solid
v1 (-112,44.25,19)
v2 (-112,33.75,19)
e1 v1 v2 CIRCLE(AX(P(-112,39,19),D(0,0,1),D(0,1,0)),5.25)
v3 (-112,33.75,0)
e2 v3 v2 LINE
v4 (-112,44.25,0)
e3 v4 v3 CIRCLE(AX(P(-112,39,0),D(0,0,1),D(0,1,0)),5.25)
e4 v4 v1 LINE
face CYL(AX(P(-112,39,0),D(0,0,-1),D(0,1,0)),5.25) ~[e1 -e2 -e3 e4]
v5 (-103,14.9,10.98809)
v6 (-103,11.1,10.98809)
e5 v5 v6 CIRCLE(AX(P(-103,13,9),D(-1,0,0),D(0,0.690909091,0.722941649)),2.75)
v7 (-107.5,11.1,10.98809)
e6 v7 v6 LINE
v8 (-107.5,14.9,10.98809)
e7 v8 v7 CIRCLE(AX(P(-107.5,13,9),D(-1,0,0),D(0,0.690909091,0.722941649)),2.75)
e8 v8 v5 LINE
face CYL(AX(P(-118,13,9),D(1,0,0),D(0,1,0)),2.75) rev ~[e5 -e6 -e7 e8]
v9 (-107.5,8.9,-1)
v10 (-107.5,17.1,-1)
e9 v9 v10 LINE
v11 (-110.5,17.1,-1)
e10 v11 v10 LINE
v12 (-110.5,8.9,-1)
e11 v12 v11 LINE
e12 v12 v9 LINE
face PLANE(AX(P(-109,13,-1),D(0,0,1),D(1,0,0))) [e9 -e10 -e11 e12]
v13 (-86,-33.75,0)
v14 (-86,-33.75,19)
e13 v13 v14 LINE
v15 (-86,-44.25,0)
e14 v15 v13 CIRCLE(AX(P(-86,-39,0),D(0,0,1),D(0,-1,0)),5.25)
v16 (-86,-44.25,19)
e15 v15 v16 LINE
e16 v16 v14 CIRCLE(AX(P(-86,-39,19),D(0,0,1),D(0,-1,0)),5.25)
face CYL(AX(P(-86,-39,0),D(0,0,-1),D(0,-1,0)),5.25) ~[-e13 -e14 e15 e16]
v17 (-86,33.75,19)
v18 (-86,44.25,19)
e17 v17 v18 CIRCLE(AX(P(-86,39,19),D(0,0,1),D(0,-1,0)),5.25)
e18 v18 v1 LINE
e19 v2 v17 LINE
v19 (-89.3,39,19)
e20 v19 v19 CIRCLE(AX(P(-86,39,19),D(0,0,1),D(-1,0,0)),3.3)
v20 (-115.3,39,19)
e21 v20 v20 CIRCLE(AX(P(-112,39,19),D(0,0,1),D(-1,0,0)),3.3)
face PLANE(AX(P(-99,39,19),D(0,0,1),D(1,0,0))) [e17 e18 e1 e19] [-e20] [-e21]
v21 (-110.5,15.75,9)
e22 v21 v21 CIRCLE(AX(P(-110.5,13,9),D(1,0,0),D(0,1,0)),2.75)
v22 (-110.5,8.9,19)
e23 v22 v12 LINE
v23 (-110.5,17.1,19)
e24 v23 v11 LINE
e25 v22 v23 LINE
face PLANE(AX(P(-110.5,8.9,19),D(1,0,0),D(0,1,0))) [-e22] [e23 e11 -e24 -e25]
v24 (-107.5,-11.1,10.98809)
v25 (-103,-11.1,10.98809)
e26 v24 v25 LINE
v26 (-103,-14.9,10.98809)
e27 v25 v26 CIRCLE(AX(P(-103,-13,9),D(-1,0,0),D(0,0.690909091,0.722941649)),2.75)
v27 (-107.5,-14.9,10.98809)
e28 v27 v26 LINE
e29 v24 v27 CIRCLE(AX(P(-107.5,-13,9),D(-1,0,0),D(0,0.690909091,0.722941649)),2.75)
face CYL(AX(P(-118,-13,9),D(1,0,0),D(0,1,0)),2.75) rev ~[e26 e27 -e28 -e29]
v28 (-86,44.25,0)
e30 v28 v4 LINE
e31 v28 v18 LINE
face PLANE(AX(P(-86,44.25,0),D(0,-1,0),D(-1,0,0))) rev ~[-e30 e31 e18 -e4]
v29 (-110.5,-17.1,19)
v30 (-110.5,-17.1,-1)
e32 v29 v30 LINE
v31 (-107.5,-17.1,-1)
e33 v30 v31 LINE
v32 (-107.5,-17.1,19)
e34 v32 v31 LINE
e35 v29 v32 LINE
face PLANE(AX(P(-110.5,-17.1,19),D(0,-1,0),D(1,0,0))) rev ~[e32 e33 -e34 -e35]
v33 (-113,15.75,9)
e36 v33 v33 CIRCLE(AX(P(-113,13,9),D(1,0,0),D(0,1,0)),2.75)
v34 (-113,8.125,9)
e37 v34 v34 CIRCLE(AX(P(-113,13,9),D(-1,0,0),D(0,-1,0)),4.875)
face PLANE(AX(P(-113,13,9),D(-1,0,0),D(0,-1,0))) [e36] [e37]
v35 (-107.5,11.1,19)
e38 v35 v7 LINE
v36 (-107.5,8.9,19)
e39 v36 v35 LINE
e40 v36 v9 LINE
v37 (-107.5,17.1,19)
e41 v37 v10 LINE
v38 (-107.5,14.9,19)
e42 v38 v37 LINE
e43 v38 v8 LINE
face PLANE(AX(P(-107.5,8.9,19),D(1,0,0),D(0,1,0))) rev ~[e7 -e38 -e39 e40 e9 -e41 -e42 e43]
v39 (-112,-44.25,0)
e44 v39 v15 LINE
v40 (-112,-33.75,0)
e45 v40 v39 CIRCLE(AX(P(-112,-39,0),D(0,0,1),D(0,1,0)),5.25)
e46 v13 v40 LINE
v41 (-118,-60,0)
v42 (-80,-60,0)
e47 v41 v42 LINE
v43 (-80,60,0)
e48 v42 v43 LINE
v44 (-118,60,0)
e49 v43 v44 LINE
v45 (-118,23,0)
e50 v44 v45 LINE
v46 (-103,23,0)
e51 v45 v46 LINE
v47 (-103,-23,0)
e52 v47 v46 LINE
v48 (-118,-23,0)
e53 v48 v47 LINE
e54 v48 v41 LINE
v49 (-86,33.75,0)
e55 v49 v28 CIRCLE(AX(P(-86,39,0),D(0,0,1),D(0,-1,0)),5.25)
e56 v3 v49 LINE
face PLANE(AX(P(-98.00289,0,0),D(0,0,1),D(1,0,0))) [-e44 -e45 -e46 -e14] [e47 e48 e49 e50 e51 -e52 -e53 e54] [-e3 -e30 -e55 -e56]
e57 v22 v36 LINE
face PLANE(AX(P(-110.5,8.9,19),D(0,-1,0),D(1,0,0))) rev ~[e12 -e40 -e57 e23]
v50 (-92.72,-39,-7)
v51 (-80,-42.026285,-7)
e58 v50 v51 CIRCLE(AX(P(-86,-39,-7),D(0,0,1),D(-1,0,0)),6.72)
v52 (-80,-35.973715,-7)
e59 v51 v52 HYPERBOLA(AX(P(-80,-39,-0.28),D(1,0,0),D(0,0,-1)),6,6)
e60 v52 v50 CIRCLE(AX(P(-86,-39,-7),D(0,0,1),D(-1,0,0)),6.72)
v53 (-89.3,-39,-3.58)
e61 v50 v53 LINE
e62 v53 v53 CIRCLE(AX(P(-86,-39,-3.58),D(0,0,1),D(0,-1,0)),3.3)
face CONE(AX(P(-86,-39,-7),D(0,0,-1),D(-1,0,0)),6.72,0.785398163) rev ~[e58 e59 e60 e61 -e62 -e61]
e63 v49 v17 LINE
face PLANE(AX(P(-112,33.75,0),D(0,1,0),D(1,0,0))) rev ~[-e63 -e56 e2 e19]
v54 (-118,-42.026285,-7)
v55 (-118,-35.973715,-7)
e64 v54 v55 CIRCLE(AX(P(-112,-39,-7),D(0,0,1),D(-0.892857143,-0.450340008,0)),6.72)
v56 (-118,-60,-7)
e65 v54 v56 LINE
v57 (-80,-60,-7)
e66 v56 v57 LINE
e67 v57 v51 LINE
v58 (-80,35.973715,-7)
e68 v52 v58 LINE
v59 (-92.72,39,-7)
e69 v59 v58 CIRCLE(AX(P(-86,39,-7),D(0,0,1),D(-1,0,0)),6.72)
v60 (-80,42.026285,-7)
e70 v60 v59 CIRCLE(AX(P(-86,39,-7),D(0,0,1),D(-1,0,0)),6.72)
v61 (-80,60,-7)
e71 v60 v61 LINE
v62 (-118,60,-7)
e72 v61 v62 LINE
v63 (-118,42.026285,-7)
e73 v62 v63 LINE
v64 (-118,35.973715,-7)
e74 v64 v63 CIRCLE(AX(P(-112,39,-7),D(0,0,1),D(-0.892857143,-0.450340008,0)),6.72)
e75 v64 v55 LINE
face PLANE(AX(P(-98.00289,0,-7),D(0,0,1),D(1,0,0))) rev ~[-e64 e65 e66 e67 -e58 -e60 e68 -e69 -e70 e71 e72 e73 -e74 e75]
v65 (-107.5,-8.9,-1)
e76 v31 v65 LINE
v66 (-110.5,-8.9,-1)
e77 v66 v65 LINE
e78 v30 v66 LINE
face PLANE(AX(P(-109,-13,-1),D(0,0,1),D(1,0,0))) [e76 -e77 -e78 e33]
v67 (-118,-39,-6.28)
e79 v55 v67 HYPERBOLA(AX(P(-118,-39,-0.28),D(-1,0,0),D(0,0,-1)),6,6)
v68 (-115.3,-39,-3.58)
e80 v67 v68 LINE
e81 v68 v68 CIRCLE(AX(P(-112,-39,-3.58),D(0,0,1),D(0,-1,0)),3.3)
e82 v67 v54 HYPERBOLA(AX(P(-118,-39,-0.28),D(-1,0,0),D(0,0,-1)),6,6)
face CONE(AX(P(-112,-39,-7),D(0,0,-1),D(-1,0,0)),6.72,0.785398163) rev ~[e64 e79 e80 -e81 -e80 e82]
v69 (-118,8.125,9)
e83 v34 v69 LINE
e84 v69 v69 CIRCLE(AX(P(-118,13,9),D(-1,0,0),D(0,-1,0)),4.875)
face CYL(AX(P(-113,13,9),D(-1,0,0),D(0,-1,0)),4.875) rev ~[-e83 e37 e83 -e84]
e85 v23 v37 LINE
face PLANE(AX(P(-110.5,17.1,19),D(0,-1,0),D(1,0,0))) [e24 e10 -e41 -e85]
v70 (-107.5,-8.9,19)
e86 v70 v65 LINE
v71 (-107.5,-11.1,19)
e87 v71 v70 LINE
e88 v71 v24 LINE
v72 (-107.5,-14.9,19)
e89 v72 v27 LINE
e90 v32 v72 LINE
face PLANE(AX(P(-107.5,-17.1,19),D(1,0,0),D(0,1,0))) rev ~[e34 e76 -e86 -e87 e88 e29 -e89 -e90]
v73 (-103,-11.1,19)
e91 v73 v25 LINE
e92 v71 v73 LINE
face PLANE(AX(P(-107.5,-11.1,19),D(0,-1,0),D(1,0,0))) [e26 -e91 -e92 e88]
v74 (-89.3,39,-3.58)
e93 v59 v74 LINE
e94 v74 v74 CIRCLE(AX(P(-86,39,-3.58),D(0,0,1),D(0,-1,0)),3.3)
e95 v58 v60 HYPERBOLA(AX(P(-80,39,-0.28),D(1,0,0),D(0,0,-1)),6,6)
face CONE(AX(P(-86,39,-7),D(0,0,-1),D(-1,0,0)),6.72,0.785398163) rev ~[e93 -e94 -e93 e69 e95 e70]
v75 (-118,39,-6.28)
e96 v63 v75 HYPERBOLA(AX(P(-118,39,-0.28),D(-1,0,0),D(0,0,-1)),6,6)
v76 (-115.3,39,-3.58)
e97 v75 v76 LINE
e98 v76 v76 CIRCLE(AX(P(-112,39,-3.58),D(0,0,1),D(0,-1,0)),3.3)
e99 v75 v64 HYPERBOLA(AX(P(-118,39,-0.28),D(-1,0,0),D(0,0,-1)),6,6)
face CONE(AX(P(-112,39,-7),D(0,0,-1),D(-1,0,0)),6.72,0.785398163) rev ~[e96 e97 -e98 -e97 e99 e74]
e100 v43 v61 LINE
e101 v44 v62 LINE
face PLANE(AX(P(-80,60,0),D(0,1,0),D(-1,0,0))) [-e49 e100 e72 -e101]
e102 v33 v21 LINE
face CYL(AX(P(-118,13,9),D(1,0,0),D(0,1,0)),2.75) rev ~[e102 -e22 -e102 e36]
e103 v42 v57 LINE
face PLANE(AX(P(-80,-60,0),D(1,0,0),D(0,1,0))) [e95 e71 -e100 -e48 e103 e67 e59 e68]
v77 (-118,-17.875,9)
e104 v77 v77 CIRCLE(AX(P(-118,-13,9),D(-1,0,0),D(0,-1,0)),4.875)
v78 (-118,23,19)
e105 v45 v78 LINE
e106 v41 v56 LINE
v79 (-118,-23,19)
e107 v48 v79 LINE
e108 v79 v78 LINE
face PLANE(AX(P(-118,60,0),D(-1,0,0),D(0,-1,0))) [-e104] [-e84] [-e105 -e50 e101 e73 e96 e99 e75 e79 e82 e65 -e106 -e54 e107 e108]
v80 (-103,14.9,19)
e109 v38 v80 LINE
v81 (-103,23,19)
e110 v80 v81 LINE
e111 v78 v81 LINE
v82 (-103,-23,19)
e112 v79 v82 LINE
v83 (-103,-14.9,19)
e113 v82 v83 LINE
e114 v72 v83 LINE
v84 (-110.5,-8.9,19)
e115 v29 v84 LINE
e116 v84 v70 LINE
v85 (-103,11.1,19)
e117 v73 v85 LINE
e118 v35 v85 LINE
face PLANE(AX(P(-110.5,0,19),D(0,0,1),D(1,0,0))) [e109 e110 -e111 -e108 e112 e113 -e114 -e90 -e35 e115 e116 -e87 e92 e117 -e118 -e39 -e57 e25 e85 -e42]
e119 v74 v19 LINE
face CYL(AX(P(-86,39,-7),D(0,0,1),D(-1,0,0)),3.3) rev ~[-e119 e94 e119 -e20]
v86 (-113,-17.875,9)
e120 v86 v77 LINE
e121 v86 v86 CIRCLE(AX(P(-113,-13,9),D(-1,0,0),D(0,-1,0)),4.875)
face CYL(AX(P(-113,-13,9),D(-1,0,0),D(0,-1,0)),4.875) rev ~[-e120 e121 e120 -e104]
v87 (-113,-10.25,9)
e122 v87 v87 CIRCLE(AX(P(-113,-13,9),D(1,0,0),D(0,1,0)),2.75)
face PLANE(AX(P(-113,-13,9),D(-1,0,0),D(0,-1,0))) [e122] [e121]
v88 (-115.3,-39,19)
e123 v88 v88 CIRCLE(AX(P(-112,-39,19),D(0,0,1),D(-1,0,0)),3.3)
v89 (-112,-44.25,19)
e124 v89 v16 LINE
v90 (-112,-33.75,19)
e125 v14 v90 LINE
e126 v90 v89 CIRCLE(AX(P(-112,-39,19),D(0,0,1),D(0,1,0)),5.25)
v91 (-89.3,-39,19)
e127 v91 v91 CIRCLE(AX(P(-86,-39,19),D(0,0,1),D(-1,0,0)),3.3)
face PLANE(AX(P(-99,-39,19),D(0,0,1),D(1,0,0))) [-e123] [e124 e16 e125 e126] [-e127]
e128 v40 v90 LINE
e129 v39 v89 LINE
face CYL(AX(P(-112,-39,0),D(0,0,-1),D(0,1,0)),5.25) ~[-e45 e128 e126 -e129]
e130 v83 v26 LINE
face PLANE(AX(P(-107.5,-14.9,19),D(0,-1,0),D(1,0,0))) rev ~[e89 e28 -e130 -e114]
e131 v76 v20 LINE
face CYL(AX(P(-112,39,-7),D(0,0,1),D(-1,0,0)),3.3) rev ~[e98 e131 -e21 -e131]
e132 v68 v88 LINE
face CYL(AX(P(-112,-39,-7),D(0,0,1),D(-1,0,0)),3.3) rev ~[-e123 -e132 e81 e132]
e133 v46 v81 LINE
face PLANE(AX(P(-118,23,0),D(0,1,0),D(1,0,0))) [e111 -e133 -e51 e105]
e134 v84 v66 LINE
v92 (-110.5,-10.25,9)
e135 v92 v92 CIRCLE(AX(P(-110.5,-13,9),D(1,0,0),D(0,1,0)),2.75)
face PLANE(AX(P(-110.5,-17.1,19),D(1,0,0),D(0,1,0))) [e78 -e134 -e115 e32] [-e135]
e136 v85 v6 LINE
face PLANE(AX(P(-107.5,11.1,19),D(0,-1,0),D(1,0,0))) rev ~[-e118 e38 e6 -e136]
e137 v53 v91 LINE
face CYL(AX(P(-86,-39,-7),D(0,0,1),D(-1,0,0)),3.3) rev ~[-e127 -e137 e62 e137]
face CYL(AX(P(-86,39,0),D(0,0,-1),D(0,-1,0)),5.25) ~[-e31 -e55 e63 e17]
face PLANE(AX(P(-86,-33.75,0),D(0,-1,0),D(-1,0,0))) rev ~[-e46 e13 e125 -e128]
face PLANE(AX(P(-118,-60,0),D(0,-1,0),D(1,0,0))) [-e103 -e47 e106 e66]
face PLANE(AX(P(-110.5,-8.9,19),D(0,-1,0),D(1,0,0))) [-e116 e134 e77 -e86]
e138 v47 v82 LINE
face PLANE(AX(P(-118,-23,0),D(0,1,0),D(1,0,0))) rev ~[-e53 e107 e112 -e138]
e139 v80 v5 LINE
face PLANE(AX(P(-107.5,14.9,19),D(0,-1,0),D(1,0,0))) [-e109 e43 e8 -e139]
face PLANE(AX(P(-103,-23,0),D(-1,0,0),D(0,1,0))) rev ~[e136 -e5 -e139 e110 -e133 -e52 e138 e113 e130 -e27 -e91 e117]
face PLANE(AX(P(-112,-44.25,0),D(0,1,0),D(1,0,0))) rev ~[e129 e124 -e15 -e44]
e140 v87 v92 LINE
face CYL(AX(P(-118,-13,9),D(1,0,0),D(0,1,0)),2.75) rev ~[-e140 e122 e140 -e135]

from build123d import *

# Parameters (mm, degrees)
F0_W           = 15
F0_H           = 46
F0_R           = 2.5
F1_DEPTH       = 7
F2_DEPTH       = 19
F4_D           = 5.5
F4_CBORE_D     = 9.75
F4_CBORE_DEPTH = 5
F5_W           = 3
F5_H           = 8.2
F6_DEPTH       = 20
F8_D           = 6.6
F8_DEPTH       = 40
F8_CSINK_D     = 13.44
F8_CSINK_ANGLE = 90
F8_TIP         = 1.9828400428
F9_W           = 4.5
F9_H           = 3.8
F10_DEPTH      = 10


# Not quite as in the source:
# - a feature names something its author has since deleted; it is built from what else it names


with BuildPart() as f1:
    # F0 (on Top) → F1 (new body)
    with BuildSketch(Plane.XY):
        Polygon((-80, -60), (-80, 60), (-118, 60), (-118, 23), (-103, 23), (-103, -23), (-118, -23), (-118, -60), align=None)
        with BuildLine():
            Line((-86, -44.25), (-112, -44.25))
            ThreePointArc((-112, -44.25), (-117.25, -39), (-112, -33.75))
            Line((-112, -33.75), (-86, -33.75))
            ThreePointArc((-86, -33.75), (-80.75, -39), (-86, -44.25))
        make_face(mode=Mode.SUBTRACT)
        with BuildLine():
            Line((-86, 33.75), (-112, 33.75))
            ThreePointArc((-112, 33.75), (-117.25, 39), (-112, 44.25))
            Line((-112, 44.25), (-86, 44.25))
            ThreePointArc((-86, 44.25), (-80.75, 39), (-86, 33.75))
        make_face(mode=Mode.SUBTRACT)
        with Locations((-110.5, 0)):
            Rectangle(F0_W, F0_H)
        with BuildLine():
            ThreePointArc((-112, 44.25), (-117.25, 39), (-112, 33.75))
            Line((-112, 33.75), (-86, 33.75))
            ThreePointArc((-86, 33.75), (-80.75, 39), (-86, 44.25))
            Line((-86, 44.25), (-112, 44.25))
        make_face()
        with Locations((-112, 39)):
            Circle(F0_R, mode=Mode.SUBTRACT)
        with Locations((-86, 39)):
            Circle(F0_R, mode=Mode.SUBTRACT)
        with BuildLine():
            ThreePointArc((-112, -33.75), (-117.25, -39), (-112, -44.25))
            Line((-112, -44.25), (-86, -44.25))
            ThreePointArc((-86, -44.25), (-80.75, -39), (-86, -33.75))
            Line((-86, -33.75), (-112, -33.75))
        make_face()
        with Locations((-112, -39)):
            Circle(F0_R, mode=Mode.SUBTRACT)
        with BuildLine():
            ThreePointArc((-83.5, -39), (-86, -41.5), (-88.5, -39))
            ThreePointArc((-88.5, -39), (-86, -36.5), (-83.5, -39))
        make_face(mode=Mode.SUBTRACT)
        with Locations((-112, 39)):
            Circle(F0_R)
        with Locations((-86, 39)):
            Circle(F0_R)
        with Locations((-112, -39)):
            Circle(F0_R)
        with BuildLine():
            ThreePointArc((-83.5, -39), (-86, -36.5), (-88.5, -39))
            ThreePointArc((-88.5, -39), (-86, -41.5), (-83.5, -39))
        make_face()
    extrude(amount=-F1_DEPTH)

    # F0 (on Top) → F2 (join)
    with BuildSketch(Plane.XY):
        with BuildLine():
            ThreePointArc((-112, 44.25), (-117.25, 39), (-112, 33.75))
            Line((-112, 33.75), (-86, 33.75))
            ThreePointArc((-86, 33.75), (-80.75, 39), (-86, 44.25))
            Line((-86, 44.25), (-112, 44.25))
        make_face()
        with Locations((-112, 39)):
            Circle(F0_R, mode=Mode.SUBTRACT)
        with Locations((-86, 39)):
            Circle(F0_R, mode=Mode.SUBTRACT)
        with BuildLine():
            ThreePointArc((-112, -33.75), (-117.25, -39), (-112, -44.25))
            Line((-112, -44.25), (-86, -44.25))
            ThreePointArc((-86, -44.25), (-80.75, -39), (-86, -33.75))
            Line((-86, -33.75), (-112, -33.75))
        make_face()
        with Locations((-112, -39)):
            Circle(F0_R, mode=Mode.SUBTRACT)
        with BuildLine():
            ThreePointArc((-83.5, -39), (-86, -41.5), (-88.5, -39))
            ThreePointArc((-88.5, -39), (-86, -36.5), (-83.5, -39))
        make_face(mode=Mode.SUBTRACT)
        with Locations((-110.5, 0)):
            Rectangle(F0_W, F0_H)
        with Locations((-112, 39)):
            Circle(F0_R)
        with Locations((-86, 39)):
            Circle(F0_R)
        with BuildLine():
            ThreePointArc((-83.5, -39), (-86, -36.5), (-88.5, -39))
            ThreePointArc((-88.5, -39), (-86, -41.5), (-83.5, -39))
        make_face()
        with Locations((-112, -39)):
            Circle(F0_R)
    extrude(amount=F2_DEPTH)

    # F4 (through all)
    with Locations(Plane(origin=(-118, 0, 0), x_dir=(0, -1, 0), z_dir=(-1, 0, 0))):
        with Locations((-13, 9), (13, 9)):
            CounterBoreHole(F4_D / 2, F4_CBORE_D / 2, F4_CBORE_DEPTH)

    # F5 (on face) → F6 (cut)
    with BuildSketch(Plane.XY.offset(19)):
        with Locations((-109, 13)):
            Rectangle(F5_W, F5_H)
        with Locations((-109, -13)):
            Rectangle(F5_W, F5_H)
    extrude(amount=-F6_DEPTH, mode=Mode.SUBTRACT)

    # F8
    with Locations(Plane(origin=(0, 0, -7), x_dir=(1, 0, 0), z_dir=(0, 0, -1))):
        with Locations((-86, -39), (-112, -39), (-112, 39), (-86, 39)):
            CounterSinkHole(F8_D / 2, F8_CSINK_D / 2, depth=F8_DEPTH, counter_sink_angle=F8_CSINK_ANGLE)
            with Locations((0, 0, -(F8_DEPTH + F8_TIP / 2))):  # 118° drill point
                Cone(0, F8_D / 2, F8_TIP, mode=Mode.SUBTRACT)

    # F9 (on face) → F10 (cut)
    with BuildSketch(Plane.XY.offset(19)):
        with Locations((-105.25, 13)):
            Rectangle(F9_W, F9_H)
        with Locations((-105.25, -13)):
            Rectangle(F9_W, F9_H)
    extrude(amount=-F10_DEPTH, mode=Mode.SUBTRACT)


solid = f1.part
